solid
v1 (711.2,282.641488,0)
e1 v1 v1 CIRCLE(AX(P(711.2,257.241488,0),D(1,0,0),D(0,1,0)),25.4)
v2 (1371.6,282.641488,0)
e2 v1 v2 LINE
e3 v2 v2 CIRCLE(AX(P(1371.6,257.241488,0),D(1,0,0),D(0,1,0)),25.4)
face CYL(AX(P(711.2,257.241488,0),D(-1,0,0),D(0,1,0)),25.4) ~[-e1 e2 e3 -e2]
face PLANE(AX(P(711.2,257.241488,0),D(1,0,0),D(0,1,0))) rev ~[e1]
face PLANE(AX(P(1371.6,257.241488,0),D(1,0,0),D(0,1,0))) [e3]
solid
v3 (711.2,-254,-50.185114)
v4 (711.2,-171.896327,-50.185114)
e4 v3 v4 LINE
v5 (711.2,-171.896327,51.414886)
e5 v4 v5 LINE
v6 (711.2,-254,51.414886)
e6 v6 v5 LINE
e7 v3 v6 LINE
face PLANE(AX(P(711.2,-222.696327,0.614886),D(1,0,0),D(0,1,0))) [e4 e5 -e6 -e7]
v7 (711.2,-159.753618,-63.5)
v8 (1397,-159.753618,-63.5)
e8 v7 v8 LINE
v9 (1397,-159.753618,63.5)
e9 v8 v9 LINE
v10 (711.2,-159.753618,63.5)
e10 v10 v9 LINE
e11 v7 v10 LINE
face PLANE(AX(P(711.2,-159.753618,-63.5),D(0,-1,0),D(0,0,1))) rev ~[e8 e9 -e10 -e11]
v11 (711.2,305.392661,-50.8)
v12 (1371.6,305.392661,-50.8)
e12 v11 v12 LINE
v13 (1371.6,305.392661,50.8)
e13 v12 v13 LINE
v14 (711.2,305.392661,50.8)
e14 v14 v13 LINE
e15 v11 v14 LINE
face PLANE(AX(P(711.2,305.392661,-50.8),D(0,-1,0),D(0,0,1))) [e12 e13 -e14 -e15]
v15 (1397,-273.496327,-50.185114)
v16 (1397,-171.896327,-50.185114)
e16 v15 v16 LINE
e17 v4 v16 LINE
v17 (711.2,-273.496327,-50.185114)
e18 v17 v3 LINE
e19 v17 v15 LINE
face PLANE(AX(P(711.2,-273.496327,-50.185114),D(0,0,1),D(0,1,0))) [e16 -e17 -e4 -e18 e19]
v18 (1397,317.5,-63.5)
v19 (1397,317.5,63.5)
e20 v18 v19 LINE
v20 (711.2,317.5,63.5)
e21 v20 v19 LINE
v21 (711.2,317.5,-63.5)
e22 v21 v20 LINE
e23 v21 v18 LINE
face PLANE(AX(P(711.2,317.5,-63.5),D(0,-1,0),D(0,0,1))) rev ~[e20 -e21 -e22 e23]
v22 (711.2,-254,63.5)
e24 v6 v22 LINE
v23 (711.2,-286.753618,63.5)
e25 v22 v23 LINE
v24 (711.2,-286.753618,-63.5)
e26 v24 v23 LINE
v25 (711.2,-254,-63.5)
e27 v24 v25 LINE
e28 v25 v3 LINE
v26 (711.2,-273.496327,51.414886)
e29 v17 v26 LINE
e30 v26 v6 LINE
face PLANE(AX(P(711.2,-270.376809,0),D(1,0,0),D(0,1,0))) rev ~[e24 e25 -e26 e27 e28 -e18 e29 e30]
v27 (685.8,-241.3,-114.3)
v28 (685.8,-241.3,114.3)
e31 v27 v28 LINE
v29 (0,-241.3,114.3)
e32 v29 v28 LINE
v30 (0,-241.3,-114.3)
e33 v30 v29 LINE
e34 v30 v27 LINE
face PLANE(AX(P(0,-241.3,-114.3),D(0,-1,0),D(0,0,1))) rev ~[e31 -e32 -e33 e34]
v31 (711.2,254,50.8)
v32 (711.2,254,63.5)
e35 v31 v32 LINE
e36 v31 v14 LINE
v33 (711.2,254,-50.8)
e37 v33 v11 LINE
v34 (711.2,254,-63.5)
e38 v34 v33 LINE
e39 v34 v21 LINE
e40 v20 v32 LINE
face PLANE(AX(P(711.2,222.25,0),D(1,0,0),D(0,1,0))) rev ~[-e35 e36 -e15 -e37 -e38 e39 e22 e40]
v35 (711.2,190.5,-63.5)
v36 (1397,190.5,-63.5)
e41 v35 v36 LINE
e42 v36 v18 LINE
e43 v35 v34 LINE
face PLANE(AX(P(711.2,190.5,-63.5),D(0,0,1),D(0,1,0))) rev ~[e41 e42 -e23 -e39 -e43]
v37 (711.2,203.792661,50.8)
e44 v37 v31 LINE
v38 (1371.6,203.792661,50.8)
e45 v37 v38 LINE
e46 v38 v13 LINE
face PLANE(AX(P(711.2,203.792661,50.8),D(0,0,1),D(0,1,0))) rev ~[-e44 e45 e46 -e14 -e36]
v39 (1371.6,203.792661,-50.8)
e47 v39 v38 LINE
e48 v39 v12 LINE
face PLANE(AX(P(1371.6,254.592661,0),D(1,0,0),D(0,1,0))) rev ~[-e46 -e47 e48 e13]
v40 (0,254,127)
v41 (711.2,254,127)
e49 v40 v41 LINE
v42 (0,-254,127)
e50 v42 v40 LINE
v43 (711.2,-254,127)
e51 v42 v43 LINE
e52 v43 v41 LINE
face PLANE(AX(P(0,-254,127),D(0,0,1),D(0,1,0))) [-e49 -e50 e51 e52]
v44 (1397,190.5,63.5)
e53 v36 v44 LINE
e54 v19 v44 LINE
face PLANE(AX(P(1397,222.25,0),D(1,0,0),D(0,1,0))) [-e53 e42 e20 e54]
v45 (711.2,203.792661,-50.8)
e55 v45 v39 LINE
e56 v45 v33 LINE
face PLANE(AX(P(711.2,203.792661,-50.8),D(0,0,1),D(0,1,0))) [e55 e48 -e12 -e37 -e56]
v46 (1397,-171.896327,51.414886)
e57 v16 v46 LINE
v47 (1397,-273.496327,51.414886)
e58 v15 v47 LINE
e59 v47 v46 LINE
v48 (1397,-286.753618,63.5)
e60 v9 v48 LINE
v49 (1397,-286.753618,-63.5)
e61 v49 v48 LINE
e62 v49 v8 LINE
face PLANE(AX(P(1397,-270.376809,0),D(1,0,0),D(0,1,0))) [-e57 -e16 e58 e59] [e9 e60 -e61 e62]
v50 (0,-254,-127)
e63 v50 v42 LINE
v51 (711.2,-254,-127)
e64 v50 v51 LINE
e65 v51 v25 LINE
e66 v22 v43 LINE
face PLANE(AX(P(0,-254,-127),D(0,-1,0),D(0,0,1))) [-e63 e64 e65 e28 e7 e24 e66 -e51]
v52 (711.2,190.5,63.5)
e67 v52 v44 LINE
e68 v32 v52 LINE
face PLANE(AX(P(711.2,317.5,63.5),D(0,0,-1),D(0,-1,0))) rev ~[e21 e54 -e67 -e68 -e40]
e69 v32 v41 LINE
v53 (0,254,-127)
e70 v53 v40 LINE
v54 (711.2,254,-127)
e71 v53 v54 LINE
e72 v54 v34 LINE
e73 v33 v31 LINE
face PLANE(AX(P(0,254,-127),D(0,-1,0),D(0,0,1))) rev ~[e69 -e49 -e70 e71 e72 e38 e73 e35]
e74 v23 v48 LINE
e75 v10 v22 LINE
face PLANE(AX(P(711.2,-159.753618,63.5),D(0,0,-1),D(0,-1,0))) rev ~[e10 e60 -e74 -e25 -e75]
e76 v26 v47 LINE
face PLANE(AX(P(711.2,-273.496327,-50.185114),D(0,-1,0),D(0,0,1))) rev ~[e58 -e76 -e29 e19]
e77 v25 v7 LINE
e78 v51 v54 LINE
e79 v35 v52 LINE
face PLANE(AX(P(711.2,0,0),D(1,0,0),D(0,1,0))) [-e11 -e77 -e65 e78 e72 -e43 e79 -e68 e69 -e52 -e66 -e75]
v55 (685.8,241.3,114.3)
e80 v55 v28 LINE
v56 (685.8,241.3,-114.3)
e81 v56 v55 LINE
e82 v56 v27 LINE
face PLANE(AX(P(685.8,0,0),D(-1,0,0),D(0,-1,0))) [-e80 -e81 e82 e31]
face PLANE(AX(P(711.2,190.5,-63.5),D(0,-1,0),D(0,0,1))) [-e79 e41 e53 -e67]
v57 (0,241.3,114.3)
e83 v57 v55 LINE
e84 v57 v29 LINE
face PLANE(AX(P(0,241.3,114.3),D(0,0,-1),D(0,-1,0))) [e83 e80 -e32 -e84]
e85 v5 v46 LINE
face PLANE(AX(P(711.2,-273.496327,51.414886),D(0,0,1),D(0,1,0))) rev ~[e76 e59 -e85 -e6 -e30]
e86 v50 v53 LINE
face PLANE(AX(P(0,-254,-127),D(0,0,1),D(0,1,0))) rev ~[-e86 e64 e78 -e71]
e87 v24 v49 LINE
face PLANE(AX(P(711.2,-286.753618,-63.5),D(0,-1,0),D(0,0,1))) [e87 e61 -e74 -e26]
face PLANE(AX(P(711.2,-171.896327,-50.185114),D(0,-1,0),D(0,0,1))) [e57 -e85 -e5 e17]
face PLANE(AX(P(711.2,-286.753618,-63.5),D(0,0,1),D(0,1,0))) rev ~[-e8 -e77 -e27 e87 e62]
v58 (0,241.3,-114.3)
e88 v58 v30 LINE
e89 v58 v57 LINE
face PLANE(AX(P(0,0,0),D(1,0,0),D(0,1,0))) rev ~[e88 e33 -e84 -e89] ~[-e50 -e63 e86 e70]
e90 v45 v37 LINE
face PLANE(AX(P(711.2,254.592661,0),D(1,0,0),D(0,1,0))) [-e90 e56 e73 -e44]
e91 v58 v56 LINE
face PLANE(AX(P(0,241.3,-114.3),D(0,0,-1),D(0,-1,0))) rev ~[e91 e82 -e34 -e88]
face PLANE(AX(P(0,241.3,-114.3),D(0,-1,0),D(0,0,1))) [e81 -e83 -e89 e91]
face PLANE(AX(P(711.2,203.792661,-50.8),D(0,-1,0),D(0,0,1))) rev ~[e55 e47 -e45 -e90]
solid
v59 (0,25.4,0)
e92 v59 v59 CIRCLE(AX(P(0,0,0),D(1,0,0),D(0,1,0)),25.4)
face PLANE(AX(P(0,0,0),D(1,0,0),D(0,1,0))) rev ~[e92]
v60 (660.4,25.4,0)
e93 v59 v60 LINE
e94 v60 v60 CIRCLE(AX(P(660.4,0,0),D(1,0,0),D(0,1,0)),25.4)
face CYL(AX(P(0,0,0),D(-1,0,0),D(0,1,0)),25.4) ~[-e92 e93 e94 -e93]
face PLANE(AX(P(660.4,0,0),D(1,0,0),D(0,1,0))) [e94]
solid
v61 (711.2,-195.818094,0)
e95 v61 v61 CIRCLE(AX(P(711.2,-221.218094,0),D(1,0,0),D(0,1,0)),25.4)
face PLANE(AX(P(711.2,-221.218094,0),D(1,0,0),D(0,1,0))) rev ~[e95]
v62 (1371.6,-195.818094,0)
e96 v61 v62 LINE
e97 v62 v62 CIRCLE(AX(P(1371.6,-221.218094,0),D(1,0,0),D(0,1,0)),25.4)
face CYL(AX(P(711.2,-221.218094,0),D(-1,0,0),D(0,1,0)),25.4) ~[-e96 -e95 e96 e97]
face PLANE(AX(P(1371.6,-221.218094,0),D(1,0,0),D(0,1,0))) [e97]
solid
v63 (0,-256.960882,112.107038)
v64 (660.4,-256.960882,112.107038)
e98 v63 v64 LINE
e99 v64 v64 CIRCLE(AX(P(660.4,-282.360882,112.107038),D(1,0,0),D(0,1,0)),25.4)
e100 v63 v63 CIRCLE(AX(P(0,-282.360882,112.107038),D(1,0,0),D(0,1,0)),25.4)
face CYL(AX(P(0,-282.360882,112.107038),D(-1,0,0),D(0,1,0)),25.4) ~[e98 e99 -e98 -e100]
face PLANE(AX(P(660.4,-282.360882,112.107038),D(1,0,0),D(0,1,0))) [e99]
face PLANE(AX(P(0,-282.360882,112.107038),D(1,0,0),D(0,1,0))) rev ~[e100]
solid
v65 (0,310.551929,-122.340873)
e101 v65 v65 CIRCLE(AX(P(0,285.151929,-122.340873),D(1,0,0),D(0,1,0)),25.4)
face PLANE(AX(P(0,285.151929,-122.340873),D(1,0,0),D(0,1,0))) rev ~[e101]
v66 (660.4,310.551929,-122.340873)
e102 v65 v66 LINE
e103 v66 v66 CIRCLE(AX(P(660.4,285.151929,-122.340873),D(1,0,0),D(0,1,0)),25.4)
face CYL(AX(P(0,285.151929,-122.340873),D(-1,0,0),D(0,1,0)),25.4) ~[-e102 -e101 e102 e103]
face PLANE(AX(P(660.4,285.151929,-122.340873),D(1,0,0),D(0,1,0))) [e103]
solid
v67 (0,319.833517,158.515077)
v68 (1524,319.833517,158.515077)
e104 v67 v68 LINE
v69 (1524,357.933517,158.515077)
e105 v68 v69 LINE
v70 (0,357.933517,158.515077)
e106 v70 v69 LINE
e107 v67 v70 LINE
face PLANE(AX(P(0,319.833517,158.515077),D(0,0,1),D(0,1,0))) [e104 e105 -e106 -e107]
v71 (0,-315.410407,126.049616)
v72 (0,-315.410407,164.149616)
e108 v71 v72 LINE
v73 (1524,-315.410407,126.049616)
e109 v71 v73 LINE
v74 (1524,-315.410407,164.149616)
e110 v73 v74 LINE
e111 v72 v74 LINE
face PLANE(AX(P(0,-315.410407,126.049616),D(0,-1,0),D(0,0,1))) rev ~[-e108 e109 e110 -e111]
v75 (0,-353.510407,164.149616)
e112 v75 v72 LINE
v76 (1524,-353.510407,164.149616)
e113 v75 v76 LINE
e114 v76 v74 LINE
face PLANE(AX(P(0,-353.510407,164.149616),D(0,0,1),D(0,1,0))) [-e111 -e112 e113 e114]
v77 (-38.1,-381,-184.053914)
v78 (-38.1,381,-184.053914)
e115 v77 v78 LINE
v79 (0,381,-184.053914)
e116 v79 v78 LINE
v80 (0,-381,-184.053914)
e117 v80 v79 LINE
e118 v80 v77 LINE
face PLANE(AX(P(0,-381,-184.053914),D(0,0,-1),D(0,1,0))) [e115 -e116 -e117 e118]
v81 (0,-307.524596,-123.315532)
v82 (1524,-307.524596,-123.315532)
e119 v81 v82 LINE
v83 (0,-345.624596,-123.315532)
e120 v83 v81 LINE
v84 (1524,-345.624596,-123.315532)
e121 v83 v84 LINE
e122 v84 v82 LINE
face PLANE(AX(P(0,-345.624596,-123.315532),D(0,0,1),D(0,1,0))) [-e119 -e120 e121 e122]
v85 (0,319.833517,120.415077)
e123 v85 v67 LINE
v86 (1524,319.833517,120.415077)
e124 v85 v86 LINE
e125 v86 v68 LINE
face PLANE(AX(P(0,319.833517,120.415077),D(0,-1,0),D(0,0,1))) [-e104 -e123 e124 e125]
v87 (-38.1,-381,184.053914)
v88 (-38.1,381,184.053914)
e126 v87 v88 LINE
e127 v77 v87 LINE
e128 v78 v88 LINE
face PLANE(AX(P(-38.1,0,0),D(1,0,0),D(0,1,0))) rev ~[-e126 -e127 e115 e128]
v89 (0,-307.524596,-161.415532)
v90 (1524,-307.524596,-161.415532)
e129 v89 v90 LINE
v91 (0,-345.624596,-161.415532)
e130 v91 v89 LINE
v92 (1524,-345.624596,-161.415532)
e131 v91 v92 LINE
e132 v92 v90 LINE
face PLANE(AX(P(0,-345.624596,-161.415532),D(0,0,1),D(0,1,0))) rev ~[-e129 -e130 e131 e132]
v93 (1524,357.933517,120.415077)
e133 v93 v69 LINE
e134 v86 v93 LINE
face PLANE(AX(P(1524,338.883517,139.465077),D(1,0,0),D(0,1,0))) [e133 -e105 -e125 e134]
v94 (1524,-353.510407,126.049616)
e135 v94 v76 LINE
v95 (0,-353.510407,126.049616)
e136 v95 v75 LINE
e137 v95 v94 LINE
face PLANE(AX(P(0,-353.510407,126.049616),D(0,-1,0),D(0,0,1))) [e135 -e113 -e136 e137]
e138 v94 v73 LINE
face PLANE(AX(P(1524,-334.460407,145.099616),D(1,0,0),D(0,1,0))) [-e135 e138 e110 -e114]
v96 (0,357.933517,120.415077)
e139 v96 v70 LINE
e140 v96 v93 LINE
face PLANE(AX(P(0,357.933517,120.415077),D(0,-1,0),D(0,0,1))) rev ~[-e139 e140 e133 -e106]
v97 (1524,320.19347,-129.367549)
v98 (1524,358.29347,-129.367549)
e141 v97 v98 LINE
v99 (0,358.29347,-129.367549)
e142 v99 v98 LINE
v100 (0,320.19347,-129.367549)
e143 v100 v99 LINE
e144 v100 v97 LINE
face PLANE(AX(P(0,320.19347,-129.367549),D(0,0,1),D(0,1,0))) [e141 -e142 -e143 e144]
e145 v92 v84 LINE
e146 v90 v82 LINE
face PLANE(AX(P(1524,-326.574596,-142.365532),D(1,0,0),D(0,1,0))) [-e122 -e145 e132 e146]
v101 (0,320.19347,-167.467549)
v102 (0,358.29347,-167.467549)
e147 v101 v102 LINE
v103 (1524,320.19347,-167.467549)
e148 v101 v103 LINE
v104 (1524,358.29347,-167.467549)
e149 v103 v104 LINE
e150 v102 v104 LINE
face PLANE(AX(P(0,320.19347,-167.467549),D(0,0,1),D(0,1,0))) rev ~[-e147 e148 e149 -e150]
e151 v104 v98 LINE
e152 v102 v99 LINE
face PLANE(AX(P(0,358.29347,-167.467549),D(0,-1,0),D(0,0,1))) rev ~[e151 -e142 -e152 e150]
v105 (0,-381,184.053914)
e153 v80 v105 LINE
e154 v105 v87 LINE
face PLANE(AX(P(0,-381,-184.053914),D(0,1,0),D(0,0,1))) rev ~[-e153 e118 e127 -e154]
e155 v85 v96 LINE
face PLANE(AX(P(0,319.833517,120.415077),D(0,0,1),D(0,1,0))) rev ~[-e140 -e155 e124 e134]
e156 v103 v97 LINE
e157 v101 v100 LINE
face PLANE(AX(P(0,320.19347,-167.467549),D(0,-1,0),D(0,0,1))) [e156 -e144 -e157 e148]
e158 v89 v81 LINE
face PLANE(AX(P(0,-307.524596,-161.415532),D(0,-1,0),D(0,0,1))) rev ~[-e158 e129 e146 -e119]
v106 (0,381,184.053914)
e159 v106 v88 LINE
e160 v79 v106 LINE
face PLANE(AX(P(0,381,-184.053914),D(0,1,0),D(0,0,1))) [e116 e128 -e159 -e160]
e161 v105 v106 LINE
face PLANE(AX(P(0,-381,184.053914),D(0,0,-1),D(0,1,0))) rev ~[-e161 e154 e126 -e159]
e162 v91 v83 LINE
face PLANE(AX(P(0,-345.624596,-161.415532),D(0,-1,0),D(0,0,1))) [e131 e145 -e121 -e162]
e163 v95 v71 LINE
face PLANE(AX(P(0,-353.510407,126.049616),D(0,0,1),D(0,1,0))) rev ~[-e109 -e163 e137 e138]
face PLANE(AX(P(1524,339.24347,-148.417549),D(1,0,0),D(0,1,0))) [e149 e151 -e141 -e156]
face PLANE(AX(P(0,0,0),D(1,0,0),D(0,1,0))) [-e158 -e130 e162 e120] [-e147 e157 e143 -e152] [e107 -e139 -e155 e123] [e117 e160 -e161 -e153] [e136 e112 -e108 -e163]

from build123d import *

# Parameters (mm, degrees)
F0_W      = 508
F0_H      = 254
F1_DEPTH  = 711.2
F2_W      = 482.6
F2_H      = 228.6
F3_DEPTH  = 685.8
F4_R      = 25.4
F5_DEPTH  = 660.4
F6_W      = 32.7536183119
F6_H      = 127
F6_W_2    = 94.2463816881
F7_DEPTH  = 685.8
F8_W      = 101.6
F8_H      = 101.6
F9_DEPTH  = 685.8
F10_R     = 25.4
F11_DEPTH = 660.4
F12_W     = 762
F12_H     = 368.1078273856
F13_DEPTH = 38.1
F14_W     = 63.5
F14_H     = 127
F15_DEPTH = 685.8
F16_W     = 101.6
F16_H     = 101.6
F17_DEPTH = 660.4
F18_R     = 25.4
F19_DEPTH = 660.4
F20_W     = 38.1
F20_H     = 38.1
F21_DEPTH = 1524
F22_R     = 25.4
F23_DEPTH = 660.4


with BuildPart() as f1:
    # F0 (on Right) → F1 (new body)
    with BuildSketch(Plane.YZ):
        Rectangle(F0_W, F0_H)
    extrude(amount=F1_DEPTH)

    # F2 (on face) → F3 (cut)
    with BuildSketch(Plane(origin=(0, 0, 0), x_dir=(0, -1, 0), z_dir=(-1, 0, 0))):
        Rectangle(F2_W, F2_H)
    extrude(amount=-F3_DEPTH, mode=Mode.SUBTRACT)

    # F6 (on face) → F7 (join)
    with BuildSketch(Plane.YZ.offset(711.2)):
        with Locations((-270.3768091559, 0)):
            Rectangle(F6_W, F6_H)
        with Locations((-206.8768091559, 0)):
            Rectangle(F6_W_2, F6_H)
    extrude(amount=F7_DEPTH)

    # F8 (on face) → F9 (cut)
    with BuildSketch(Plane.YZ.offset(711.2)):
        with Locations((-222.696326673, 0.6148855095)):
            Rectangle(F8_W, F8_H)
    extrude(amount=F9_DEPTH, mode=Mode.SUBTRACT)

    # F14 (on face) → F15 (join)
    with BuildSketch(Plane.YZ.offset(711.2)):
        with Locations((222.25, 0)):
            Rectangle(F14_W, F14_H)
        with Locations((285.75, 0)):
            Rectangle(F14_W, F14_H)
    extrude(amount=F15_DEPTH)

    # F16 (on face) → F17 (cut)
    with BuildSketch(Plane.YZ.offset(711.2)):
        with Locations((254.5926607187, 0)):
            Rectangle(F16_W, F16_H)
    extrude(amount=F17_DEPTH, mode=Mode.SUBTRACT)


with BuildPart() as f5:
    # F4 (on Right) → F5 (new body)
    with BuildSketch(Plane.YZ):
        Circle(F4_R)
    extrude(amount=F5_DEPTH)


with BuildPart() as f11:
    # F10 (on face) → F11 (new body)
    with BuildSketch(Plane.YZ.offset(711.2)):
        with Locations((-221.2180942297, 0)):
            Circle(F10_R)
    extrude(amount=F11_DEPTH)


with BuildPart() as f13:
    # F12 (on Right) → F13 (new body)
    with BuildSketch(Plane.YZ):
        Rectangle(F12_W, F12_H)
    extrude(amount=-F13_DEPTH)

    # F20 (on face) → F21 (join)
    with BuildSketch(Plane.YZ):
        with Locations((339.2434695244, -148.4175494432)):
            Rectangle(F20_W, F20_H)
        with Locations((338.8835170746, 139.4650766134)):
            Rectangle(F20_W, F20_H)
        with Locations((-334.4604074955, 145.0996161673)):
            Rectangle(F20_W, F20_H)
        with Locations((-326.5745958805, -142.3655322313)):
            Rectangle(F20_W, F20_H)
    extrude(amount=F21_DEPTH)


with BuildPart() as f19:
    # F18 (on face) → F19 (new body)
    with BuildSketch(Plane.YZ.offset(711.2)):
        with Locations((257.2414875031, 0)):
            Circle(F18_R)
    extrude(amount=F19_DEPTH)


with BuildPart() as f23:
    # F22 (on face) → F23 (new body)
    with BuildSketch(Plane.YZ):
        with Locations((-282.360881567, 112.1070384979)):
            Circle(F22_R)
    extrude(amount=F23_DEPTH)


with BuildPart() as f23b:
    # F22 (on face) → F23, piece 2 (new body)
    with BuildSketch(Plane.YZ):
        with Locations((285.1519286633, -122.3408728838)):
            Circle(F22_R)
    extrude(amount=F23_DEPTH)


solid = Compound([f1.part, f5.part, f11.part, f13.part, f19.part, f23.part, f23b.part])
